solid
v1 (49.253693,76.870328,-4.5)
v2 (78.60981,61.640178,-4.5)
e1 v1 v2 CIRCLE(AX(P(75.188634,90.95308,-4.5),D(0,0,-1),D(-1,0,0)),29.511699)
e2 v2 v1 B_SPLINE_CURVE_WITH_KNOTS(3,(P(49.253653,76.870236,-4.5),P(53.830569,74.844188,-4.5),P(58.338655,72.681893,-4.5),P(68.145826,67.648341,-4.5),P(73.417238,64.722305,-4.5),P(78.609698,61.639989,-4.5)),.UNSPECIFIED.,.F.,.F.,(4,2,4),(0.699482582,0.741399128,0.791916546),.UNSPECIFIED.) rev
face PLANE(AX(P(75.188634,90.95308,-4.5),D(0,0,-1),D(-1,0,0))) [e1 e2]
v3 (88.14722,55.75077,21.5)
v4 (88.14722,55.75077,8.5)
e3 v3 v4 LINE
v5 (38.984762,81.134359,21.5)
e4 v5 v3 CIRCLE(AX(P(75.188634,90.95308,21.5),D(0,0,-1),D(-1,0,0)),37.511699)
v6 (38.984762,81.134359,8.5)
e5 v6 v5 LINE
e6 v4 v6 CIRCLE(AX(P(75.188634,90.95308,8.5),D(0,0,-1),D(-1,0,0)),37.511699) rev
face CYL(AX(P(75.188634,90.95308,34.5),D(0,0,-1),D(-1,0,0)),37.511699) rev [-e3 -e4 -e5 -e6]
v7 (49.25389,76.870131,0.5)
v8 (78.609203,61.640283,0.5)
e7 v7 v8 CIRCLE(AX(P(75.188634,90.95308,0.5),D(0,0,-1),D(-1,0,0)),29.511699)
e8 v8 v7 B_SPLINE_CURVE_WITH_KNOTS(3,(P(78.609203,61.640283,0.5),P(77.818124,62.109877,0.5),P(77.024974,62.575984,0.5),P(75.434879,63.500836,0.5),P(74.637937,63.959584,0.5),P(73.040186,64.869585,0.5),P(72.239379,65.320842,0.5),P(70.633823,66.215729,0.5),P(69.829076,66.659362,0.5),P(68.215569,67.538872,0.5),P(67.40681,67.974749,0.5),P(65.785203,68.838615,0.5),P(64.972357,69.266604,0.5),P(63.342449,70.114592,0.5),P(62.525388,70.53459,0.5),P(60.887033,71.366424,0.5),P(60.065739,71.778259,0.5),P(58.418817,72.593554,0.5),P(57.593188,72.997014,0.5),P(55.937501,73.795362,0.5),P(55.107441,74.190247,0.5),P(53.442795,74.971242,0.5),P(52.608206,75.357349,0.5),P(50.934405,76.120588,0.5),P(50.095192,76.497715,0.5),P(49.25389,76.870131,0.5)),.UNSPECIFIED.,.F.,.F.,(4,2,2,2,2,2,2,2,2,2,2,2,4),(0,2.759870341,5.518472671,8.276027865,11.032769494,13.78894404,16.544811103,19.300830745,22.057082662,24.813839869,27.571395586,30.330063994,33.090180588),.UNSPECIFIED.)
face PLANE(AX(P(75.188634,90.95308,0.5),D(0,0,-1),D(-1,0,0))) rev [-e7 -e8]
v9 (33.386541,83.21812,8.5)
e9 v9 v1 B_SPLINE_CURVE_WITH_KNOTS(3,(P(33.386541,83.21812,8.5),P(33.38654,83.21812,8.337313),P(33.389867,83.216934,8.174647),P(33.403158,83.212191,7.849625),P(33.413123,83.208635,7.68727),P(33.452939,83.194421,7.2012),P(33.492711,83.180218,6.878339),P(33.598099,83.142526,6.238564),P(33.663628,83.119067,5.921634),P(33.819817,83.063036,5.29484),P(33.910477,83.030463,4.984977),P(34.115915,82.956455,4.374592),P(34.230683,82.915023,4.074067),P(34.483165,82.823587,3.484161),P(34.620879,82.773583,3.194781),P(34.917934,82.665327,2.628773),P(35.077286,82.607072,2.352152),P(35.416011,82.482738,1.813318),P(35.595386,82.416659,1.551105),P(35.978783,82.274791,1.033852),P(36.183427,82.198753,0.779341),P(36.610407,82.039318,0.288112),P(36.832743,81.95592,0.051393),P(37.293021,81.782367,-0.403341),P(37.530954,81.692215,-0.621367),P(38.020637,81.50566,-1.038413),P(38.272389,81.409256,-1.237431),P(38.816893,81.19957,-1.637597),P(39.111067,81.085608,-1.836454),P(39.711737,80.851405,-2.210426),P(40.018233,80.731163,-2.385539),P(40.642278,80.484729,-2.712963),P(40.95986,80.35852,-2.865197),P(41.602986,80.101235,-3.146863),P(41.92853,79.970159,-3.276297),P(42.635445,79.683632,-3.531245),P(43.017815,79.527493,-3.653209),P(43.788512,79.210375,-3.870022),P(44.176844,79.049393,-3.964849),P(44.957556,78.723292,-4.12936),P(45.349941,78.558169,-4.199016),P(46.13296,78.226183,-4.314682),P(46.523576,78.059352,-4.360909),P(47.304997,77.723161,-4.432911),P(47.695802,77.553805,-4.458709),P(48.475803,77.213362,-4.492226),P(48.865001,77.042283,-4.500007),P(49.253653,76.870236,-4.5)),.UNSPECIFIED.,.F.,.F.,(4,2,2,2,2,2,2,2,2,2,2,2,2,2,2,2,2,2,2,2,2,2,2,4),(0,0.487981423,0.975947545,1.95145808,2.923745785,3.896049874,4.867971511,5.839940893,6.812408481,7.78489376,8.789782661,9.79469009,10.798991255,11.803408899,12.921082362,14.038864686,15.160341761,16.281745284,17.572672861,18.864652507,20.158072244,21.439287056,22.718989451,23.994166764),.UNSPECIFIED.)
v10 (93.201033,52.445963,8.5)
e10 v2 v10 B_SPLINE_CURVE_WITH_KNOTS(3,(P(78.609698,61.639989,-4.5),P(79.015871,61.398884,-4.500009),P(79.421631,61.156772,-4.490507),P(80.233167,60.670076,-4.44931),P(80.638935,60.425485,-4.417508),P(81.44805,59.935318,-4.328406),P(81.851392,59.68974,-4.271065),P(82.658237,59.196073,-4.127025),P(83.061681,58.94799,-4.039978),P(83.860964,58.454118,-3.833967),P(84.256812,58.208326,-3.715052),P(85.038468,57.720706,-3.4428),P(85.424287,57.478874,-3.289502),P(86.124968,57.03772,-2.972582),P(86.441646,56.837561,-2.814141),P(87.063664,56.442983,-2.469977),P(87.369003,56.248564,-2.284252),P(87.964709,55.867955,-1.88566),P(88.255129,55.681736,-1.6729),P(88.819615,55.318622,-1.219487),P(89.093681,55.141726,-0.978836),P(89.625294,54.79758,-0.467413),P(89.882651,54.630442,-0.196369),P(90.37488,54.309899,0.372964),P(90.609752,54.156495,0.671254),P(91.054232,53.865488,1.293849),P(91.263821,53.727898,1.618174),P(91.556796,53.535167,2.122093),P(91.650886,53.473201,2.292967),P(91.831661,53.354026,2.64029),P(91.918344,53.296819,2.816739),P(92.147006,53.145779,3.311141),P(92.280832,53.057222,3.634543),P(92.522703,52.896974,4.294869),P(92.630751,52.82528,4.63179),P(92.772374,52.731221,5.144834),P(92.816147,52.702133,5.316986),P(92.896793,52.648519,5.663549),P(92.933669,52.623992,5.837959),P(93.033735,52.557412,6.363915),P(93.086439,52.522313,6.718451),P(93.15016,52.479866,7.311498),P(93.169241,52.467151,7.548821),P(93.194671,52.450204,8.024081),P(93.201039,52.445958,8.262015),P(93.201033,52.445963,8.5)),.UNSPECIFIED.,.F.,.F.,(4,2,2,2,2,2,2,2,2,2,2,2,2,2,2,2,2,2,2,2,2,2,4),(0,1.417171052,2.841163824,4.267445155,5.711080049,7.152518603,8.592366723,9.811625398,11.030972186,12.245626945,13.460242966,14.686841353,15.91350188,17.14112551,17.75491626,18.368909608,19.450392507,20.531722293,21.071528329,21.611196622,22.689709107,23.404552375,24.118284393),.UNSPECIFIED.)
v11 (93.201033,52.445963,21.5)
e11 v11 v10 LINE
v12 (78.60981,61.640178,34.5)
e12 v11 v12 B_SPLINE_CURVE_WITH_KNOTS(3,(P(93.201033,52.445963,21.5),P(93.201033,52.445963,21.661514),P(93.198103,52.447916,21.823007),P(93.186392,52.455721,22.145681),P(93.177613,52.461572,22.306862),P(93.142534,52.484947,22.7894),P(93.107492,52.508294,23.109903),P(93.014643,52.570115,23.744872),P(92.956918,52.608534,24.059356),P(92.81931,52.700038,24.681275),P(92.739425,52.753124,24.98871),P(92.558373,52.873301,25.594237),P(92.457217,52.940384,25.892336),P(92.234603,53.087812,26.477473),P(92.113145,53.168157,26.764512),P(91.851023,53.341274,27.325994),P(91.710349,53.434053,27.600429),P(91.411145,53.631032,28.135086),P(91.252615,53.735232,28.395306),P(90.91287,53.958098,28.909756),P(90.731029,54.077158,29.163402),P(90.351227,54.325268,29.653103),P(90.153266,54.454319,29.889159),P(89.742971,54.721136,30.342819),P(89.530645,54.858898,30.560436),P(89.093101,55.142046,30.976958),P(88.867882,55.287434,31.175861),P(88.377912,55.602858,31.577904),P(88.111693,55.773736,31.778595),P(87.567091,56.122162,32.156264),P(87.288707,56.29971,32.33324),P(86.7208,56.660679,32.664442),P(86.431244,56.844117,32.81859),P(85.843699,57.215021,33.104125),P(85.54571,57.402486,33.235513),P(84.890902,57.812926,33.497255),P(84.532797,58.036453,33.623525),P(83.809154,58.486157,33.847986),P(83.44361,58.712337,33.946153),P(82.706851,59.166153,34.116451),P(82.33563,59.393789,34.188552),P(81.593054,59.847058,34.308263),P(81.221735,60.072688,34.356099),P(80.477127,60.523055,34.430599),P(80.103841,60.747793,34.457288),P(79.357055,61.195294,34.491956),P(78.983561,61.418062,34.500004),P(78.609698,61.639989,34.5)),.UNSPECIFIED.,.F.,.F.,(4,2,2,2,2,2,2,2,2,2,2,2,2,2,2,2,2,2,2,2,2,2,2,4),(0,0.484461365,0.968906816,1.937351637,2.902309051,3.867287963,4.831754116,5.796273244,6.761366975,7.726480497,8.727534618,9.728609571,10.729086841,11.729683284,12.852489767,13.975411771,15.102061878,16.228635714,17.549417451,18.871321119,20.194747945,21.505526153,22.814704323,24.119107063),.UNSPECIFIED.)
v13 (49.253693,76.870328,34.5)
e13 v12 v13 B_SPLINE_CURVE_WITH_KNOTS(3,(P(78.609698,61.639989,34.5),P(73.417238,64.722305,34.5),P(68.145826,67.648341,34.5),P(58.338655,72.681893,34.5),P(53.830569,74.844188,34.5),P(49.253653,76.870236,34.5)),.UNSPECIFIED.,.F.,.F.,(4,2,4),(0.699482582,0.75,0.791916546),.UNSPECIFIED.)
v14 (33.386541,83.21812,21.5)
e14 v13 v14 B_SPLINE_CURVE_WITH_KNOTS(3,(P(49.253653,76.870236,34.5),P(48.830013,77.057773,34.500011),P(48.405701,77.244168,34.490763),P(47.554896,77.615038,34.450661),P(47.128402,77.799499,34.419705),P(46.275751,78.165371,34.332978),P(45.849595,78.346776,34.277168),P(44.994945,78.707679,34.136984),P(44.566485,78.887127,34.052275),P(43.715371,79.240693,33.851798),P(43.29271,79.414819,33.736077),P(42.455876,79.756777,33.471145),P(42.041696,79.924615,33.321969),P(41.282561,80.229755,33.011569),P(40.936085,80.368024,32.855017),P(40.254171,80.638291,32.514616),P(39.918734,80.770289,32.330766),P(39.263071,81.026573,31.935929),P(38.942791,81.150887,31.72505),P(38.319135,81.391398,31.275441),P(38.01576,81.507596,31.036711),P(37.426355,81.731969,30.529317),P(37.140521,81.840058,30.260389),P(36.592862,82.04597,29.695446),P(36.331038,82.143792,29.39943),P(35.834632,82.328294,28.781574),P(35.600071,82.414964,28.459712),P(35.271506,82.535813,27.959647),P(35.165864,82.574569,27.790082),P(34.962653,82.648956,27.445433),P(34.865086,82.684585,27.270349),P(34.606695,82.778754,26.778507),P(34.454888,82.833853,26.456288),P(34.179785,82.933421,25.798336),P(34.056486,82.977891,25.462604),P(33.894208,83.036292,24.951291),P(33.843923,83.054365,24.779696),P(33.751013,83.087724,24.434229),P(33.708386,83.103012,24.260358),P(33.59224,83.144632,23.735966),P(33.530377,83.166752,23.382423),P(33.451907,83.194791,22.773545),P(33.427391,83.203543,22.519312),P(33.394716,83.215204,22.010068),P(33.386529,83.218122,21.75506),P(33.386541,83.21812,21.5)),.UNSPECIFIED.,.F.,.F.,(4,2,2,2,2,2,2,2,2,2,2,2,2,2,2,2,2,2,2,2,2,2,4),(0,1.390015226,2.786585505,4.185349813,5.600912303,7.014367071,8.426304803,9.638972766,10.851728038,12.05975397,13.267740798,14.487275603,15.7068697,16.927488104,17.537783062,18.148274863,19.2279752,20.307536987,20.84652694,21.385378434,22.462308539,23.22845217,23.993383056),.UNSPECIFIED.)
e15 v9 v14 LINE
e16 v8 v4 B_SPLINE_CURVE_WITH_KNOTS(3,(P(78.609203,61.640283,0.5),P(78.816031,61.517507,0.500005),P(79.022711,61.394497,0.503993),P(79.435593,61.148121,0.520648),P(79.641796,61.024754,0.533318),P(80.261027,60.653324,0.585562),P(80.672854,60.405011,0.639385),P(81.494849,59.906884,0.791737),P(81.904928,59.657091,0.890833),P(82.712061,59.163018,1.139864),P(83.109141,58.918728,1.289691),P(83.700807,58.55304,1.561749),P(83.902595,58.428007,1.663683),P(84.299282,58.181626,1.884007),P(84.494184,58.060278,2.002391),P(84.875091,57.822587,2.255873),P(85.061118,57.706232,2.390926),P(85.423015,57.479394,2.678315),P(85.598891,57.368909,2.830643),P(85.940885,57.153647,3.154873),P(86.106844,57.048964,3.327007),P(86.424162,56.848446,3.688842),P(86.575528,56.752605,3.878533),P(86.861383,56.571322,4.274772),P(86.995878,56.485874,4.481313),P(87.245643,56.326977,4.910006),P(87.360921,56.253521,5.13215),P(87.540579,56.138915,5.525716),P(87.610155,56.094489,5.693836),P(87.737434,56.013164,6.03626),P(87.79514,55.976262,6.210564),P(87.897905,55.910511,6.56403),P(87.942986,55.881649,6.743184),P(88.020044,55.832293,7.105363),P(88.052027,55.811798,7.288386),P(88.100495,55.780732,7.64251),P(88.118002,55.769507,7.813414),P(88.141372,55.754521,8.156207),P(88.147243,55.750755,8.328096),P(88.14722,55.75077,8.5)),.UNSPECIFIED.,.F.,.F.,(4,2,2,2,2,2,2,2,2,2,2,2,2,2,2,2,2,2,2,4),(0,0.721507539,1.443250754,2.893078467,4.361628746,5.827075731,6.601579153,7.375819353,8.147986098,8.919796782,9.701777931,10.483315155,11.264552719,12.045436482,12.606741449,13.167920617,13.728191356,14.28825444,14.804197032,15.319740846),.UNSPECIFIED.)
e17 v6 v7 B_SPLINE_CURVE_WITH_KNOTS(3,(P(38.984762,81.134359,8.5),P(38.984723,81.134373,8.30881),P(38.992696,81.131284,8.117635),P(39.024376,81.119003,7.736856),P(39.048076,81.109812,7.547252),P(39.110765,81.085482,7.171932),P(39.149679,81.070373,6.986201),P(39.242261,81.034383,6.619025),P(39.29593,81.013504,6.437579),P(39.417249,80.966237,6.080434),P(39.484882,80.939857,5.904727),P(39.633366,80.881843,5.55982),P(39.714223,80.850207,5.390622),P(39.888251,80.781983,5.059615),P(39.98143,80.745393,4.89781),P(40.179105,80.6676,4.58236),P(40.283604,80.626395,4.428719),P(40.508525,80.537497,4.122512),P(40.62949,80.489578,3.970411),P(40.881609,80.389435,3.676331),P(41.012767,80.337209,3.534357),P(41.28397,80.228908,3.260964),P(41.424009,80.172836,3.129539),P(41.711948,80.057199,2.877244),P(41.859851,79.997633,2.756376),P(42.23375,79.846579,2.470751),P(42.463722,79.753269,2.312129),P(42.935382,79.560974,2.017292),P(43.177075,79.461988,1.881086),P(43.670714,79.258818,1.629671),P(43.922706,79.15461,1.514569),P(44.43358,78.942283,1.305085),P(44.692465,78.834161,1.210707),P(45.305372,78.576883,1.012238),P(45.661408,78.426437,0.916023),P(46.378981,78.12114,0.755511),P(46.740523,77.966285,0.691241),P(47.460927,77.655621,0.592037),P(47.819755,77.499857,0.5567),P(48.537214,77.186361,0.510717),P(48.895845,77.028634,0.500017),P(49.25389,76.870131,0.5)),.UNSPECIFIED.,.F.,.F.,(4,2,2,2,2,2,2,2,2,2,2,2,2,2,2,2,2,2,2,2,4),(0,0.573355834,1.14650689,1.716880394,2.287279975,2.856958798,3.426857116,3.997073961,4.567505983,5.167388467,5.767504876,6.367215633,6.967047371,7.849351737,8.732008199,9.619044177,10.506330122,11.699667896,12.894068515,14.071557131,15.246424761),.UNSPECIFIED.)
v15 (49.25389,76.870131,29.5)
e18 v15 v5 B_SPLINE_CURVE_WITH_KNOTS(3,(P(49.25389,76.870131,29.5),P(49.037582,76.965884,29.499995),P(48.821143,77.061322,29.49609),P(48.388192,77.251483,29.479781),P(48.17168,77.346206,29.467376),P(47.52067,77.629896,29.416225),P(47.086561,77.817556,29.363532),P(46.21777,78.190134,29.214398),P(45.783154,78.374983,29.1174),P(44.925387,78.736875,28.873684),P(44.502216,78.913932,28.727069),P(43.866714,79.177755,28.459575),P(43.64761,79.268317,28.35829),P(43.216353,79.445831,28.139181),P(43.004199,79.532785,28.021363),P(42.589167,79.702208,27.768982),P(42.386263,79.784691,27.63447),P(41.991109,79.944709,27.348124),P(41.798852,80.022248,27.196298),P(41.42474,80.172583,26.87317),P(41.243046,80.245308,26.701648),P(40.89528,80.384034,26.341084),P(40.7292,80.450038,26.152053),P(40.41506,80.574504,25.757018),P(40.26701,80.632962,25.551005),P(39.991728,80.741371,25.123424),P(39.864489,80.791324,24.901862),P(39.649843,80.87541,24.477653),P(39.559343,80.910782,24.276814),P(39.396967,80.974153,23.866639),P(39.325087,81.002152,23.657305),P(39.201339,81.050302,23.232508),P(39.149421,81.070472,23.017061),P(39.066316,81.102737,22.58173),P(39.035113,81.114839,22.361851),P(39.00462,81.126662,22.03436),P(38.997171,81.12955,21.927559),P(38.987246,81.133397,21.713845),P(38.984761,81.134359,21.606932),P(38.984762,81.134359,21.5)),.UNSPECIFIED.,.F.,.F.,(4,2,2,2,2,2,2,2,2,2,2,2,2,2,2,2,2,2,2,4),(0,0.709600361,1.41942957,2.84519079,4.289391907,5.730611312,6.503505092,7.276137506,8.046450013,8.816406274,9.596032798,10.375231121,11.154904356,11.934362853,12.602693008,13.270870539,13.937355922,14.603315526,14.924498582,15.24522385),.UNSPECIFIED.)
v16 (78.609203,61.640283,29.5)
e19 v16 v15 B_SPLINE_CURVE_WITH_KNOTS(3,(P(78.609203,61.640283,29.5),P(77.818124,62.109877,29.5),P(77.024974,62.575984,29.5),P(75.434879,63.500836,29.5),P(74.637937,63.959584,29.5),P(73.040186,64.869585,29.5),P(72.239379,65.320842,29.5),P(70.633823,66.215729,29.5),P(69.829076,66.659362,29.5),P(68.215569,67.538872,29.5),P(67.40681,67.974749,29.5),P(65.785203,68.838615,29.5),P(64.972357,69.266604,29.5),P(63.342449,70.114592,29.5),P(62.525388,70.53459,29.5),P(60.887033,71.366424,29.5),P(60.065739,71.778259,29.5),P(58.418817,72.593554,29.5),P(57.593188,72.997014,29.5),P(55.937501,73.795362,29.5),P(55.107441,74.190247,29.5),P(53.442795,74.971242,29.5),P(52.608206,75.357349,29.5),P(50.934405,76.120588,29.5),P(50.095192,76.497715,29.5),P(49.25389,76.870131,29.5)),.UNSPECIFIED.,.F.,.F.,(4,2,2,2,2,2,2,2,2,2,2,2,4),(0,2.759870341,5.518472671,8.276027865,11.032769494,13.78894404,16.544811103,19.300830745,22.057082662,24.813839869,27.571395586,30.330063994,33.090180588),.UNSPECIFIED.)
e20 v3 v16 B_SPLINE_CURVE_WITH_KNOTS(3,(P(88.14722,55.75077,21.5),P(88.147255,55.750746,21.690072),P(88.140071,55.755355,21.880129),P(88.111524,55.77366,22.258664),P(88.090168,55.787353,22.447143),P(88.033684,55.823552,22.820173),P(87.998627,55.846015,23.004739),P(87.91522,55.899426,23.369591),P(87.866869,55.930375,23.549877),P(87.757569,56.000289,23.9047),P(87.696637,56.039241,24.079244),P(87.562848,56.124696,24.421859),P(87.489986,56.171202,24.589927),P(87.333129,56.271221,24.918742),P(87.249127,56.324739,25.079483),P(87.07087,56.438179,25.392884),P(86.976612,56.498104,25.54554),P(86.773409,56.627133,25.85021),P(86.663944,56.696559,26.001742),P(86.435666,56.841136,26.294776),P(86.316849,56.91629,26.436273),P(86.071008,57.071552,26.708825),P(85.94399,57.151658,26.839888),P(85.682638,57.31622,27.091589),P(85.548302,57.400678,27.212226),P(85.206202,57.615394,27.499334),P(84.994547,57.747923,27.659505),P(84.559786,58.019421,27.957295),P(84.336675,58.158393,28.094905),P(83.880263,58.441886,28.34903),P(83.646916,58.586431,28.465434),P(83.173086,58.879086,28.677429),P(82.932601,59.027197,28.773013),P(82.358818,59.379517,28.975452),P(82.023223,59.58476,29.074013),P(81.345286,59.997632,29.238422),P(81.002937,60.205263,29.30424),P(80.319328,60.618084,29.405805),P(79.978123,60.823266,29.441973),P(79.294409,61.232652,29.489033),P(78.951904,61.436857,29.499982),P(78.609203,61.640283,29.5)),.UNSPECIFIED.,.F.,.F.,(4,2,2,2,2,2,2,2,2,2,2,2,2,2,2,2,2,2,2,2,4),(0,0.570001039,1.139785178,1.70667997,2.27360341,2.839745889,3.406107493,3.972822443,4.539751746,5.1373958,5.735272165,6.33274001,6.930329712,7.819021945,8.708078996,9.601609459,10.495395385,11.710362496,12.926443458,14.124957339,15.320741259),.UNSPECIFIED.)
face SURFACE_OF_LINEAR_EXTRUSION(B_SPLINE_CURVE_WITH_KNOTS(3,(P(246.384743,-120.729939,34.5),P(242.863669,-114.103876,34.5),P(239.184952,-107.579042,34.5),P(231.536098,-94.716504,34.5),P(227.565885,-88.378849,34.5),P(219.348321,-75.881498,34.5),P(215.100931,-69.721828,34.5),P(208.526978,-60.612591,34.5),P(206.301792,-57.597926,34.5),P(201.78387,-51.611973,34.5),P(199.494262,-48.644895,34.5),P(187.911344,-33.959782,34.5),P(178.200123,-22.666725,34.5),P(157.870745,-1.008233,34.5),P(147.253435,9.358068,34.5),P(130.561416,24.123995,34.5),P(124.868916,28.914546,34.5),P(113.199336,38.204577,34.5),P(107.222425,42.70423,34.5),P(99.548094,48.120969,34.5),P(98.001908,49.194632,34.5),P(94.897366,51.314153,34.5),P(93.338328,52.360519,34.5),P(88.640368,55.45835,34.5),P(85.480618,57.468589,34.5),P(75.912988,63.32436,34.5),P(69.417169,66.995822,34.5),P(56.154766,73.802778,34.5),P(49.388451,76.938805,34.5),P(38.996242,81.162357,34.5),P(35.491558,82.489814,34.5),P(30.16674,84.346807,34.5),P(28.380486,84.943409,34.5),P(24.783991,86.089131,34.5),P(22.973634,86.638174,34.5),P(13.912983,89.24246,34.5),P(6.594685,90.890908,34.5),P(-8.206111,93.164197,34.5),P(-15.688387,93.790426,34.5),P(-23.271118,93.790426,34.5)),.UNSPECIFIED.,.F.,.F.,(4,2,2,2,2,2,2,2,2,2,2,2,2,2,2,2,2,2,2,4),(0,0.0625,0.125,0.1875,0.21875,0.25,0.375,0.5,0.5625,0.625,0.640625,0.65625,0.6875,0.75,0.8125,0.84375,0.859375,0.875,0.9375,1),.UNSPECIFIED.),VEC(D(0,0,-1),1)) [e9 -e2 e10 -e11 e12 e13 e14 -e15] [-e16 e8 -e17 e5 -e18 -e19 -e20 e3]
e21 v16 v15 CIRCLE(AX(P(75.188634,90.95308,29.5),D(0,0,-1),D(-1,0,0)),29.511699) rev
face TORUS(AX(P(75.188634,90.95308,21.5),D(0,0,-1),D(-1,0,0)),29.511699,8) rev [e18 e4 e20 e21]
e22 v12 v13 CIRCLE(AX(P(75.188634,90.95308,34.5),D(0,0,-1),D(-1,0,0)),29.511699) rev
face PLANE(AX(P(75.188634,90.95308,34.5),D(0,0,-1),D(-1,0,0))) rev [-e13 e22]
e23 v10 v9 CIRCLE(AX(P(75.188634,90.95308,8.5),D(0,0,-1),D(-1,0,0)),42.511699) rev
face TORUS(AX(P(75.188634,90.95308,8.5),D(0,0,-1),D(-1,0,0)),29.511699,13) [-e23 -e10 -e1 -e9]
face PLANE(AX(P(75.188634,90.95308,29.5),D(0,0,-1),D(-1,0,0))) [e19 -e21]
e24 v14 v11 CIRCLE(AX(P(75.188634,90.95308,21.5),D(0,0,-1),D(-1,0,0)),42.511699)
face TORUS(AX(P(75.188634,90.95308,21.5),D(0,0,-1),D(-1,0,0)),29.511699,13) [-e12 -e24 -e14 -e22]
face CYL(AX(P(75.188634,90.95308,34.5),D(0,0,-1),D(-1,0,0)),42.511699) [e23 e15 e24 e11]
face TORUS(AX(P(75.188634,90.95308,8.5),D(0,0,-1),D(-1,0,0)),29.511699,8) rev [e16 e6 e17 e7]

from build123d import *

# Parameters (mm, degrees)
BOSS_EXTRUDE1_DEPTH = 30
CUT_EXTRUDE1_DEPTH  = 168.969030848
FILLET1_R           = 10
SCALE1_SCALE        = 1.3


# Read off the part's stored shape, not the designer's step: Shell1
with BuildPart() as part:
    # Sketch2 → Boss-Extrude1 (new body)
    with BuildSketch(Plane.XY):
        with BuildLine():
            Line((45.331903799, 79.981721463), (84.494599506, 60.509010482))
            ThreePointArc((84.494599506, 60.509010482), (90.297722371, 121.297543733), (45.331903799, 79.981721463))
        make_face()
    extrude(amount=BOSS_EXTRUDE1_DEPTH)

    # Sketch1 → Cut-Extrude1 (cut, through all)
    with BuildSketch(Plane.XY):
        with BuildLine():
            Line((-207.427585228, -70.816904485), (207.427585228, -70.816904485))
            add(Edge.make_bspline(
                [(207.427585228, -70.816904485), (204.719066948, -65.719933317), (201.889284, -60.700830274), (196.005550807, -50.806569556), (192.95154063, -45.931450365), (186.630337337, -36.318103923), (183.363114107, -31.579896009), (178.306227152, -24.572790452), (176.59454614, -22.253817483), (173.119221553, -17.649238456), (171.357984458, -15.36687097), (162.448047194, -4.070630162), (154.977877241, 4.616336839), (139.33989427, 21.276715632), (131.172732428, 29.250793453), (118.332718452, 40.609198621), (113.9538723, 44.294237763), (104.977272116, 51.440415225), (100.379648275, 54.901686704), (94.476316855, 59.06840944), (93.286942563, 59.894303876), (90.898833506, 61.524704561), (89.699573736, 62.329601355), (86.085758046, 64.712548426), (83.655181384, 66.258886343), (76.295465833, 70.763325644), (71.298682083, 73.58752698), (61.096833898, 78.823647149), (55.891976191, 81.235975187), (47.897968668, 84.484861265), (45.202058186, 85.505982488), (41.10604398, 86.934438682), (39.732002669, 87.393363058), (36.965468503, 88.274687789), (35.572885995, 88.69702827), (28.603154069, 90.700325233), (22.973694214, 91.968362661), (11.588466497, 93.717046441), (5.832869932, 94.198760634), (0, 94.198760634)],
                knots=[0, 0, 0, 0, 0.0625, 0.0625, 0.125, 0.125, 0.1875, 0.1875, 0.21875, 0.21875, 0.25, 0.25, 0.375, 0.375, 0.5, 0.5, 0.5625, 0.5625, 0.625, 0.625, 0.640625, 0.640625, 0.65625, 0.65625, 0.6875, 0.6875, 0.75, 0.75, 0.8125, 0.8125, 0.84375, 0.84375, 0.859375, 0.859375, 0.875, 0.875, 0.9375, 0.9375, 1, 1, 1, 1], degree=3))
            add(Edge.make_bspline(
                [(0, 94.198760634), (-5.820884241, 94.198760634), (-11.585134477, 93.718569751), (-20.1609329, 92.399872662), (-23.007705214, 91.86002632), (-27.261450694, 90.91109362), (-28.674084664, 90.572084497), (-31.47973914, 89.853463721), (-32.874272147, 89.473518662), (-39.807767526, 87.476345761), (-45.229994007, 85.568698392), (-55.870207421, 81.245289543), (-61.087946097, 78.828910441), (-68.783431921, 74.878131536), (-71.326646661, 73.50660424), (-76.371978809, 70.661306303), (-78.862258303, 69.194210034), (-86.23920808, 64.67349259), (-91.034638137, 61.499665526), (-100.413779162, 54.875535956), (-104.997346241, 51.425045551), (-113.975082954, 44.276738239), (-118.369171937, 40.57881601), (-126.982947787, 32.955226848), (-131.203273049, 29.02883372), (-139.47622644, 20.963360848), (-143.503896937, 16.84871123), (-155.28186699, 4.275116318), (-162.72953679, -4.411659437), (-176.861100549, -22.360208604), (-183.544936364, -31.62202579), (-192.972439212, -45.965136136), (-196.014638257, -50.821683765), (-201.885870563, -60.695257816), (-204.714974123, -65.712231316), (-207.427585228, -70.816904485)],
                knots=[0, 0, 0, 0, 0.0625, 0.0625, 0.09375, 0.09375, 0.109375, 0.109375, 0.125, 0.125, 0.1875, 0.1875, 0.25, 0.25, 0.28125, 0.28125, 0.3125, 0.3125, 0.375, 0.375, 0.4375, 0.4375, 0.5, 0.5, 0.5625, 0.5625, 0.625, 0.625, 0.75, 0.75, 0.875, 0.875, 0.9375, 0.9375, 1, 1, 1, 1], degree=3))
        make_face()
    extrude(amount=CUT_EXTRUDE1_DEPTH, mode=Mode.SUBTRACT)

    # Fillet1
    fillet1_edges = [part.edges().sort_by_distance(p)[0] for p in [
        (90.698153357, 121.095000517, 0),
        (90.698153357, 121.095000517, 30),
    ]]
    fillet(fillet1_edges, radius=FILLET1_R)


with BuildPart() as part_1:
    # Scale1: scaled about (77.570400206, 95.559844129, 14.99998931)
    add(part.part.scale(SCALE1_SCALE).moved(Location((-23.271120062, -28.667953239, -4.499996793))))

    # Shell1 outline → Shell1 (revolve, cut)
    with BuildSketch(Plane(origin=(75.188633701, 90.953080219, 0), x_dir=(1, 0, 0), z_dir=(0, -1, 0))):
        with BuildLine():
            Line((37.51169924, 8.499999927), (37.51169924, 21.499999927))
            ThreePointArc((37.51169924, 21.499999927), (35.168553489, 27.156854176), (29.51169924, 29.499999927))
            Line((29.51169924, 29.499999927), (0, 29.499999927))
            Line((0, 29.499999927), (0, 0.499999927))
            Line((0, 0.499999927), (29.51169924, 0.499999927))
            ThreePointArc((29.51169924, 0.499999927), (35.168553489, 2.843145677), (37.51169924, 8.499999927))
        make_face()
    revolve(axis=Axis((75.188633701, 90.953080219, 0), (0, 0, 1)), mode=Mode.SUBTRACT)


solid = part_1.part
